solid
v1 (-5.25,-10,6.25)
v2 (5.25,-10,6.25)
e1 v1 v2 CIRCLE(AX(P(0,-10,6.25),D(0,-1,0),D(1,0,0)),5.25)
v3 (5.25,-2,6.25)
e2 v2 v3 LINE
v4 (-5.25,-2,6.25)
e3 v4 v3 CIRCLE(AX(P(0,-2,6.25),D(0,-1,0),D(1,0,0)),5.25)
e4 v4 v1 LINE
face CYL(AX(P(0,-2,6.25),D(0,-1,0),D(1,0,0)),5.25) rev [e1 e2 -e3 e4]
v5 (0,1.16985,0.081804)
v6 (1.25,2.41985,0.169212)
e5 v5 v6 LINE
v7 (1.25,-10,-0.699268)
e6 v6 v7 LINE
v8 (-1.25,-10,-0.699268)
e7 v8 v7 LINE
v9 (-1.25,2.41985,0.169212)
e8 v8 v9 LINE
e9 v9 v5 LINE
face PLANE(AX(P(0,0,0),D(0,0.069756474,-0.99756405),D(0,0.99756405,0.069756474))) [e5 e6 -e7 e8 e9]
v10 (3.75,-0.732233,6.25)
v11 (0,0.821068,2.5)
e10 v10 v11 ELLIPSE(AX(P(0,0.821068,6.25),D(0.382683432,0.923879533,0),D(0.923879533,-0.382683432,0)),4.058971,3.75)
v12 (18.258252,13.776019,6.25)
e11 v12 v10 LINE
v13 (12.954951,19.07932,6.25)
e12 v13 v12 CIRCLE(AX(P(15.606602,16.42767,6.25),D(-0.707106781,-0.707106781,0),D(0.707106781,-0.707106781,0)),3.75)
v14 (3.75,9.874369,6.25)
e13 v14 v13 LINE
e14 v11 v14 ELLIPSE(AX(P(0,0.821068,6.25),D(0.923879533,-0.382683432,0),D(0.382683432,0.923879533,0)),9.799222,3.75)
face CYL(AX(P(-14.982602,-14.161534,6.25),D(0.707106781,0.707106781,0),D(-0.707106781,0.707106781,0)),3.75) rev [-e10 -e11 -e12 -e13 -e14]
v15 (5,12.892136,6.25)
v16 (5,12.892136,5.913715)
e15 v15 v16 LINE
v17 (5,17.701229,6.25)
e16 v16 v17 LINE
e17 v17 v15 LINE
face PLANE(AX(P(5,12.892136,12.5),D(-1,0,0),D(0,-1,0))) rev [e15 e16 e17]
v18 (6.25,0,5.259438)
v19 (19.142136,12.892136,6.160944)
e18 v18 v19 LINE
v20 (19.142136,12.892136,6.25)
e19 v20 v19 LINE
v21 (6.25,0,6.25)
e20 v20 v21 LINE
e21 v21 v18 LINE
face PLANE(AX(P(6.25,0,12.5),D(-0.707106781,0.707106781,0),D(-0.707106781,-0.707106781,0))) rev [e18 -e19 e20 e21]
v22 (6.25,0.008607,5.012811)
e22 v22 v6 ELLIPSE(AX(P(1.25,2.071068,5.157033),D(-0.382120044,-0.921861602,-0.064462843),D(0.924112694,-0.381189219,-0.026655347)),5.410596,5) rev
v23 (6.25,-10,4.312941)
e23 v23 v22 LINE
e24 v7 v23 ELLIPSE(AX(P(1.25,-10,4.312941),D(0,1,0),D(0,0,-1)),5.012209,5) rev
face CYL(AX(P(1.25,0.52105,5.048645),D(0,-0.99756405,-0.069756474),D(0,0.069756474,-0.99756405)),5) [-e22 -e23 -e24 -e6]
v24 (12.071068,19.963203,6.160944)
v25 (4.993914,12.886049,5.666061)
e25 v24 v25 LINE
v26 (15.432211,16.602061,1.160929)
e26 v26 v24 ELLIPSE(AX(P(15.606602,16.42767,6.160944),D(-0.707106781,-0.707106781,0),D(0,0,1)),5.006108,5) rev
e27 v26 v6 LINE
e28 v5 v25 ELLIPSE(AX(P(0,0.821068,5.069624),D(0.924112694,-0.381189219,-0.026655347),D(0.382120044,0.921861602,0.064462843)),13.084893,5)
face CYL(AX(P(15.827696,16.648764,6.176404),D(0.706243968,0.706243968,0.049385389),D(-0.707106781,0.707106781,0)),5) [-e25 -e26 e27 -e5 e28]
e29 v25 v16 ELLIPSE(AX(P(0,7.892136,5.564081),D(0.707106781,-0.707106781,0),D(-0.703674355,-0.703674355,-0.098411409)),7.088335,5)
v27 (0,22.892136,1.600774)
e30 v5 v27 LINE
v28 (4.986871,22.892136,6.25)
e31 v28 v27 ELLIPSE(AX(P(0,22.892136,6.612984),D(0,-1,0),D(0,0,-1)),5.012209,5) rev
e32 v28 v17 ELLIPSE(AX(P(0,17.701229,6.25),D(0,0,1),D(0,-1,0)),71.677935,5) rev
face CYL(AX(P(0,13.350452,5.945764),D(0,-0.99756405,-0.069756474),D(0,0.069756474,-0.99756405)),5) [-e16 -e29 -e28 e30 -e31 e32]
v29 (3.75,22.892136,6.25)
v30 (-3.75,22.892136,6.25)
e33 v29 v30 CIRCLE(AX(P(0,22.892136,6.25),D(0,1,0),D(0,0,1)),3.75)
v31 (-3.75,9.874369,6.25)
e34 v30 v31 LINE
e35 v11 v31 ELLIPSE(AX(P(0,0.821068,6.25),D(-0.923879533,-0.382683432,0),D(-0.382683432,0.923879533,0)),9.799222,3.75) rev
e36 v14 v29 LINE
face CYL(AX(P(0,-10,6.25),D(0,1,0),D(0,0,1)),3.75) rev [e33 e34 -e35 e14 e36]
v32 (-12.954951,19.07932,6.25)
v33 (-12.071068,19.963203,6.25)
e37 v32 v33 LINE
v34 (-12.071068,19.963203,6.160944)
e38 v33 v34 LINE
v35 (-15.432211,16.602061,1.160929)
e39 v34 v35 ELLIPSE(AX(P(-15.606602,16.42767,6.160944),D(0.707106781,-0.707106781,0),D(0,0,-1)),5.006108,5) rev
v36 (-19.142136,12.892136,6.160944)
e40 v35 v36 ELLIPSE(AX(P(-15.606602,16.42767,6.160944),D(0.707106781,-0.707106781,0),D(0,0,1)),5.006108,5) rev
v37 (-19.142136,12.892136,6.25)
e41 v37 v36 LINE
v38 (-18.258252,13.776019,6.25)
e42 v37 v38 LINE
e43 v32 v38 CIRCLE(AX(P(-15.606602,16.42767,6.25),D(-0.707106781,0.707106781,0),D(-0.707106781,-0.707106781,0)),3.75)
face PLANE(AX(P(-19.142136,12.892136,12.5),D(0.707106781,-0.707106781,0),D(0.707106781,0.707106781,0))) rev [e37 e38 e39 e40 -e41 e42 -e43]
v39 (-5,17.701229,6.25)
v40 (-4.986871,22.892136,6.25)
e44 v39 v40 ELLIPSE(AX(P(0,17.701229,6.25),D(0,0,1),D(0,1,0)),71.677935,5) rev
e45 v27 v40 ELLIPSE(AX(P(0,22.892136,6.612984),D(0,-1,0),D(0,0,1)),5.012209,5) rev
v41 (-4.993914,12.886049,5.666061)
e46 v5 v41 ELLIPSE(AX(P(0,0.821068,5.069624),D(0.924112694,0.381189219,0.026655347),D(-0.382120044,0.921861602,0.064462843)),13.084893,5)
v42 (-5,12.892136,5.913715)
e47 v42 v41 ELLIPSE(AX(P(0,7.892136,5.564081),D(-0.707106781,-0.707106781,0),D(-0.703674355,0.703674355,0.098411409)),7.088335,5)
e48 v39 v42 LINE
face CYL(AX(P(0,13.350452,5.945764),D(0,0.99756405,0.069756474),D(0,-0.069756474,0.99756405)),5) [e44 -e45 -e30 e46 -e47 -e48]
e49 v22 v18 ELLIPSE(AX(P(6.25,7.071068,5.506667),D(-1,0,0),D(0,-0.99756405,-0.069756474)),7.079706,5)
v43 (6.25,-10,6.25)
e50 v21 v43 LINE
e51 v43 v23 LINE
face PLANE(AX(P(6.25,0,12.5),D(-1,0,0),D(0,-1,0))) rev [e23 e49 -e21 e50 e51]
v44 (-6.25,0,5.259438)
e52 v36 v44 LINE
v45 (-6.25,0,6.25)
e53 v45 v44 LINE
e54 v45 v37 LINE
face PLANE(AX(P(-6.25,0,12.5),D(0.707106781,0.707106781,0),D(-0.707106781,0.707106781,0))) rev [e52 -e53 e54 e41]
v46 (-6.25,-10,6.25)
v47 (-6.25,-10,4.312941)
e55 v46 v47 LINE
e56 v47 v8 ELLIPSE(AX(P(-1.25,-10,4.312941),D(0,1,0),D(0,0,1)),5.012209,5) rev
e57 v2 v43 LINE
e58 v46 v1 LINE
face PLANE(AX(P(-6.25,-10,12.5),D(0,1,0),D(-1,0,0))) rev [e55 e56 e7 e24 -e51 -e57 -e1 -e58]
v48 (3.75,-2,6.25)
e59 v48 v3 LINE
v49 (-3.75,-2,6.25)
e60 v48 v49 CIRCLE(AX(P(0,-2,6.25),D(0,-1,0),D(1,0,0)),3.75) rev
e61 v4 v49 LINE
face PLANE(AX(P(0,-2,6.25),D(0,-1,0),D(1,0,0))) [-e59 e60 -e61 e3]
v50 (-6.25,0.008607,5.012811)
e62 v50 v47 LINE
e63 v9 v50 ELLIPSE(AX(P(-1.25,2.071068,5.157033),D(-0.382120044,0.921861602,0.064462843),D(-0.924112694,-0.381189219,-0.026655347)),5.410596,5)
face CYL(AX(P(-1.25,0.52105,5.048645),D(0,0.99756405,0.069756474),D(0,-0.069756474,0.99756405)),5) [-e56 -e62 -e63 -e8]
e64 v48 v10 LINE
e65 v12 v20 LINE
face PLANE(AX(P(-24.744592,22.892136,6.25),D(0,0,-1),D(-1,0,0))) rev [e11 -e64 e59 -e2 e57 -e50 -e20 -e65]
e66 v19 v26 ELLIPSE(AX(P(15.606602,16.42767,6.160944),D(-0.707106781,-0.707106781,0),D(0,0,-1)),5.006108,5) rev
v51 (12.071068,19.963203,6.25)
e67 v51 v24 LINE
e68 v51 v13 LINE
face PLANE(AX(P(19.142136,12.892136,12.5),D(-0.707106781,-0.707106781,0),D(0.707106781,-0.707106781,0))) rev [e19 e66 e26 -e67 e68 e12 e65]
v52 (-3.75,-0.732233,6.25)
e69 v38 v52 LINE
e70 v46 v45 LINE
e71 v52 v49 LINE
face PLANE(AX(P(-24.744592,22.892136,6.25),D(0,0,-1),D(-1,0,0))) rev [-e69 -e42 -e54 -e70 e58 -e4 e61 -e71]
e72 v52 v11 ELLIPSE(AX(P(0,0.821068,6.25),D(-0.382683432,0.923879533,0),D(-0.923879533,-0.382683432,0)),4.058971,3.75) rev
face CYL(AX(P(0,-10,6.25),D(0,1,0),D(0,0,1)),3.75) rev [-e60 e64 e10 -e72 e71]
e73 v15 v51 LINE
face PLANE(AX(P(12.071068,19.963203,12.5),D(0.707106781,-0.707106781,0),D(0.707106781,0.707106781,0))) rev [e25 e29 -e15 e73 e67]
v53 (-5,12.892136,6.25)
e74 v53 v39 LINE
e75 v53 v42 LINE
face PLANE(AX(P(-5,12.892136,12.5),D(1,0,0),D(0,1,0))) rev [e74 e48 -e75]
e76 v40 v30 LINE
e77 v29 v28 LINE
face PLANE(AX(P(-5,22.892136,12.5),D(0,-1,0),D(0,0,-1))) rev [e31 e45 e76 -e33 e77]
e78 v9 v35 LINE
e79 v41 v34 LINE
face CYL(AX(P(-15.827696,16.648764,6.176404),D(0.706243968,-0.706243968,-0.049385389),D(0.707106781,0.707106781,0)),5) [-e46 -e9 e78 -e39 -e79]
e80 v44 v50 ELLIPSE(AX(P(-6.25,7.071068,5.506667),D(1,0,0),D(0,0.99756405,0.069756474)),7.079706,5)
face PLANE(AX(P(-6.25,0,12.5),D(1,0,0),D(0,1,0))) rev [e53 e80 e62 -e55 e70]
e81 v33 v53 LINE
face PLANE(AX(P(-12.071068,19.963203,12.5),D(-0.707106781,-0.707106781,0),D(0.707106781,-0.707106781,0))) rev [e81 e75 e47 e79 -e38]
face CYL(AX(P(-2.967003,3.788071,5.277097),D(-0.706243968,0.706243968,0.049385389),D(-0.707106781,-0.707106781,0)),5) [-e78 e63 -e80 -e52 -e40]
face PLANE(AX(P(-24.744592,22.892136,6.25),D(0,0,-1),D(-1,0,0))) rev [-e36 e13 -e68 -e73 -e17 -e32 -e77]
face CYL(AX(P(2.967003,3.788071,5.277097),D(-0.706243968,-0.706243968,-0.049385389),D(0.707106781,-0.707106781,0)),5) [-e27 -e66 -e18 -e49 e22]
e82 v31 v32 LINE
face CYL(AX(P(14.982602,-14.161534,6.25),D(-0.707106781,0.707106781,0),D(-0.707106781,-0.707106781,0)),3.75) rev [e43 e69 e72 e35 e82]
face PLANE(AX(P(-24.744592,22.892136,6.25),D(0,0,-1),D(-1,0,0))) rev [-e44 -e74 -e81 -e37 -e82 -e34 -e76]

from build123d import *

# Parameters (mm, degrees)
EXTRUDE_634_DEPTH           = 12.5
SKETCH_4_R                  = 3.75
CUT_EXTRUDE_991_DEPTH       = 41.057008652
CUT_EXTRUDE_1141_REACH      = 47.49
CUT_EXTRUDE_1141_END_RADIUS = 3.75
SKETCH_5_R                  = 3.75
SKETCH_9_R                  = 5.25
CUT_EXTRUDE_1315_DEPTH      = 8
DRAFT_2_ANGLE               = 4
FILLET_8_R                  = 5
SKETCH_10_W                 = 49.037593782
SKETCH_10_H                 = 8.594475989
CUT_EXTRUDE_3_DEPTH         = 41.280697872


with BuildPart() as part:
    # Эскиз3 → Extrude 634 (new body)
    with BuildSketch(Plane.XY):
        Polygon((-6.25, 0), (-19.142135624, 12.892135624), (-12.071067812, 19.963203436), (-5, 12.892135624), (-5, 22.892135624), (5, 22.892135624), (5, 12.892135624), (12.071067812, 19.963203436), (19.142135624, 12.892135624), (6.25, 0), (6.25, -10), (-6.25, -10), align=None)
    extrude(amount=EXTRUDE_634_DEPTH)

    # Эскиз4 → Cut-Extrude 991 (cut, through all)
    with BuildSketch(Plane(origin=(0, 22.892135624, 0), x_dir=(-1, 0, 0), z_dir=(0, 1, 0))):
        with Locations(Location((0, 6.25, 0), (0, 0, 90))):
            Circle(SKETCH_4_R)
    extrude(amount=-CUT_EXTRUDE_991_DEPTH, mode=Mode.SUBTRACT)

    # Cut-Extrude 1141: up to this cylinder (the profile starts outside it)
    cut_extrude_1141_end = Plane(origin=(0, 16.42767, 6.25), z_dir=(0, 1, 0)) * Cylinder(CUT_EXTRUDE_1141_END_RADIUS, 103.48, mode=Mode.PRIVATE)
    # Эскиз5 → Cut-Extrude 1141 (cut, up to the surface)
    with BuildSketch(Plane(origin=(-16.017135624, 16.017135624, 0), x_dir=(0, 0, 1), z_dir=(-0.707106781186544, 0.7071067811865511, 0)), mode=Mode.PRIVATE) as cut_extrude_1141_sk1:
        with Locations(Location((6.25, 0.580582618, 0), (0, 0, 270))):
            Circle(SKETCH_5_R)
    cut_extrude_1141_tool1 = extrude(cut_extrude_1141_sk1.sketch, amount=-CUT_EXTRUDE_1141_REACH, mode=Mode.PRIVATE) - cut_extrude_1141_end
    cut_extrude_1141 = cut_extrude_1141_tool1.solids().sort_by_distance((-15.606602, 16.42767, 6.25))[0]
    add(cut_extrude_1141, mode=Mode.SUBTRACT)

    # Зеркальное отражение1: Cut-Extrude 1141 across plane
    add(cut_extrude_1141.mirror(Plane(origin=(0, 0, 0), x_dir=(0, 0, 1), z_dir=(1, 0, 0))), mode=Mode.SUBTRACT)

    # Эскиз9 → Cut-Extrude 1315 (cut)
    with BuildSketch(Plane.XZ.offset(10)):
        with Locations((0, 6.25)):
            Circle(SKETCH_9_R)
    extrude(amount=-CUT_EXTRUDE_1315_DEPTH, mode=Mode.SUBTRACT)

    # Уклон2
    draft_2_faces = [part.faces().sort_by_distance(p)[0] for p in [
        (0, 7.90429112, 0),
        (0, 7.90429112, 12.5),
    ]]
    draft(draft_2_faces, Plane.ZX, DRAFT_2_ANGLE)

    # Скругление8
    # the kernel refuses this fillet: 5 mm, written as the material it takes off along each edge
    with BuildSketch(Plane(origin=(-3.402831812, 4.489303811, 0.313922703), x_dir=(0.707968543318461, -0.7045235927201029, -0.049265088777904954), z_dir=(0.7062439675293066, 0.7062439675293118, 0.04938538910366094))) as fillet_8_piece_1_section:
        with BuildLine():
            CenterArc((FILLET_8_R * 0.951833326591, -FILLET_8_R), FILLET_8_R, 90, 87.17272264)
            Line((-FILLET_8_R * 0.0469494411747, -FILLET_8_R * 0.950674724384), (-FILLET_8_R * 0.06692509653, -FILLET_8_R * 0.949688218872))
            Line((-FILLET_8_R * 0.06692509653, -FILLET_8_R * 0.949688218872), (-FILLET_8_R * 0.0190366665318, FILLET_8_R * 0.02))
            Line((-FILLET_8_R * 0.0190366665318, FILLET_8_R * 0.02), (FILLET_8_R * 0.951833326591, FILLET_8_R * 0.02))
            Line((FILLET_8_R * 0.951833326591, FILLET_8_R * 0.02), (FILLET_8_R * 0.951833326591, 0))
        make_face()
    fillet_8_piece_1 = extrude(amount=33.8080501, mode=Mode.PRIVATE)
    fillet_8_piece_1 = split(fillet_8_piece_1, bisect_by=Plane(origin=(12.895577991, 19.138693257, 2.078418466), z_dir=(-0.7071067811865445, -0.7071067811865507, 0)), keep=Keep.TOP, mode=Mode.PRIVATE)
    fillet_8_piece_1 = split(fillet_8_piece_1, bisect_by=Plane(origin=(5, 15.190904261, 2.078418466), z_dir=(1, 0, 0)), keep=Keep.TOP, mode=Mode.PRIVATE)
    add(fillet_8_piece_1, mode=Mode.SUBTRACT)
    with BuildSketch(Plane(origin=(5, 35.361686252, 2.472729985), x_dir=(-1, 0, 0), z_dir=(0, -0.9975640502598243, -0.06975647374412541))) as fillet_8_piece_2_section:
        with BuildLine():
            CenterArc((FILLET_8_R, -FILLET_8_R), FILLET_8_R, 90, 90)
            Line((0, -FILLET_8_R), (-FILLET_8_R * 0.02, -FILLET_8_R))
            Line((-FILLET_8_R * 0.02, -FILLET_8_R), (-FILLET_8_R * 0.02, FILLET_8_R * 0.02))
            Line((-FILLET_8_R * 0.02, FILLET_8_R * 0.02), (FILLET_8_R, FILLET_8_R * 0.02))
            Line((FILLET_8_R, FILLET_8_R * 0.02), (FILLET_8_R, 0))
        make_face()
    fillet_8_piece_2 = extrude(amount=35.024418981, mode=Mode.PRIVATE)
    fillet_8_piece_2 = split(fillet_8_piece_2, bisect_by=Plane(origin=(3.763647995, 22.892135624, 2.280840285), z_dir=(0, -1, 0)), keep=Keep.TOP, mode=Mode.PRIVATE)
    fillet_8_piece_2 = split(fillet_8_piece_2, bisect_by=Plane(origin=(6.572735996, 14.46487162, 2.280840285), z_dir=(-0.7071067811865501, 0.707106781186545, 0)), keep=Keep.TOP, mode=Mode.PRIVATE)
    add(fillet_8_piece_2, mode=Mode.SUBTRACT)
    with BuildSketch(Plane(origin=(-5, 0.422584995, 0.029550022), x_dir=(1, 0, 0), z_dir=(0, 0.9975640502598243, 0.06975647374412541))) as fillet_8_piece_3_section:
        with BuildLine():
            CenterArc((FILLET_8_R, -FILLET_8_R), FILLET_8_R, 90, 90)
            Line((0, -FILLET_8_R), (-FILLET_8_R * 0.02, -FILLET_8_R))
            Line((-FILLET_8_R * 0.02, -FILLET_8_R), (-FILLET_8_R * 0.02, FILLET_8_R * 0.02))
            Line((-FILLET_8_R * 0.02, FILLET_8_R * 0.02), (FILLET_8_R, FILLET_8_R * 0.02))
            Line((FILLET_8_R, FILLET_8_R * 0.02), (FILLET_8_R, 0))
        make_face()
    fillet_8_piece_3 = extrude(amount=35.024418981, mode=Mode.PRIVATE)
    fillet_8_piece_3 = split(fillet_8_piece_3, bisect_by=Plane(origin=(-3.763647995, 22.892135624, 2.280840285), z_dir=(0, -1, 0)), keep=Keep.TOP, mode=Mode.PRIVATE)
    fillet_8_piece_3 = split(fillet_8_piece_3, bisect_by=Plane(origin=(-6.572735996, 14.46487162, 2.280840285), z_dir=(0.7071067811865512, 0.7071067811865438, 0)), keep=Keep.TOP, mode=Mode.PRIVATE)
    add(fillet_8_piece_3, mode=Mode.SUBTRACT)
    with BuildSketch(Plane(origin=(-20.473899624, 28.366035248, 1.983546412), x_dir=(-0.707968543318462, -0.7045235927201018, -0.04926508877790491), z_dir=(0.7062439675293055, -0.706243967529313, -0.04938538910366102))) as fillet_8_piece_4_section:
        with BuildLine():
            CenterArc((FILLET_8_R * 0.951833326591, -FILLET_8_R), FILLET_8_R, 90, 87.17272264)
            Line((-FILLET_8_R * 0.0469494411747, -FILLET_8_R * 0.950674724384), (-FILLET_8_R * 0.06692509653, -FILLET_8_R * 0.949688218872))
            Line((-FILLET_8_R * 0.06692509653, -FILLET_8_R * 0.949688218872), (-FILLET_8_R * 0.0190366665318, FILLET_8_R * 0.02))
            Line((-FILLET_8_R * 0.0190366665318, FILLET_8_R * 0.02), (FILLET_8_R * 0.951833326591, FILLET_8_R * 0.02))
            Line((FILLET_8_R * 0.951833326591, FILLET_8_R * 0.02), (FILLET_8_R * 0.951833326591, 0))
        make_face()
    fillet_8_piece_4 = extrude(amount=33.8080501, mode=Mode.PRIVATE)
    fillet_8_piece_4 = split(fillet_8_piece_4, bisect_by=Plane(origin=(-12.895577991, 19.138693257, 2.078418466), z_dir=(0.7071067811865444, -0.7071067811865508, 0)), keep=Keep.TOP, mode=Mode.PRIVATE)
    fillet_8_piece_4 = split(fillet_8_piece_4, bisect_by=Plane(origin=(-5, 15.190904261, 2.078418466), z_dir=(-1, 0, 0)), keep=Keep.TOP, mode=Mode.PRIVATE)
    add(fillet_8_piece_4, mode=Mode.SUBTRACT)
    with BuildSketch(Plane(origin=(3.024785141, -9.274785141, -0.648556156), x_dir=(0.034920743526734764, -0.034920743526734764, 0.9987797972241329), z_dir=(-0.7062439675293093, 0.7062439675293093, 0.04938538910366077))) as fillet_8_piece_5_section:
        with BuildLine():
            CenterArc((FILLET_8_R * 1.0506041048, FILLET_8_R), FILLET_8_R, 177.17272264, 92.82727736)
            Line((FILLET_8_R * 0.0518213370326, FILLET_8_R * 1.04932527562), (FILLET_8_R * 0.0318456816773, FILLET_8_R * 1.05031178113))
            Line((FILLET_8_R * 0.0318456816773, FILLET_8_R * 1.05031178113), (-FILLET_8_R * 0.021012082096, -FILLET_8_R * 0.02))
            Line((-FILLET_8_R * 0.021012082096, -FILLET_8_R * 0.02), (FILLET_8_R * 1.0506041048, -FILLET_8_R * 0.02))
            Line((FILLET_8_R * 1.0506041048, -FILLET_8_R * 0.02), (FILLET_8_R * 1.0506041048, 0))
        make_face()
    fillet_8_piece_5 = extrude(amount=44.519609867, mode=Mode.PRIVATE)
    fillet_8_piece_5 = split(fillet_8_piece_5, bisect_by=Plane(origin=(-6.25, 7.634264741, 1.775571736), z_dir=(-1, 0, 0)), keep=Keep.TOP, mode=Mode.PRIVATE)
    fillet_8_piece_5 = split(fillet_8_piece_5, bisect_by=Plane(origin=(-18.350004337, 13.68426691, 1.775571736), z_dir=(0.7071067811865444, -0.7071067811865508, 0)), keep=Keep.TOP, mode=Mode.PRIVATE)
    add(fillet_8_piece_5, mode=Mode.SUBTRACT)
    with BuildSketch(Plane(origin=(-6.25, -22.469550628, -1.571224041), x_dir=(0, -0.06975647374412541, 0.9975640502598242), z_dir=(0, 0.9975640502598243, 0.06975647374412541))) as fillet_8_piece_6_section:
        with BuildLine():
            CenterArc((FILLET_8_R, FILLET_8_R), FILLET_8_R, 180, 90)
            Line((0, FILLET_8_R), (-FILLET_8_R * 0.02, FILLET_8_R))
            Line((-FILLET_8_R * 0.02, FILLET_8_R), (-FILLET_8_R * 0.02, -FILLET_8_R * 0.02))
            Line((-FILLET_8_R * 0.02, -FILLET_8_R * 0.02), (FILLET_8_R, -FILLET_8_R * 0.02))
            Line((FILLET_8_R, -FILLET_8_R * 0.02), (FILLET_8_R, 0))
        make_face()
    fillet_8_piece_6 = extrude(amount=35.024418981, mode=Mode.PRIVATE)
    fillet_8_piece_6 = split(fillet_8_piece_6, bisect_by=Plane(origin=(-2.999285634, -3.250714366, 0.827701668), z_dir=(-0.7071067811865476, -0.7071067811865476, 0)), keep=Keep.TOP, mode=Mode.PRIVATE)
    fillet_8_piece_6 = split(fillet_8_piece_6, bisect_by=Plane(origin=(-5.249047512, -10, 0.827701668), z_dir=(0, 1, 0)), keep=Keep.TOP, mode=Mode.PRIVATE)
    add(fillet_8_piece_6, mode=Mode.SUBTRACT)
    with BuildSketch(Plane(origin=(6.25, 12.469550628, 0.871955922), x_dir=(-1, 0, 0), z_dir=(0, -0.9975640502598243, -0.06975647374412541))) as fillet_8_piece_7_section:
        with BuildLine():
            CenterArc((FILLET_8_R, -FILLET_8_R), FILLET_8_R, 90, 90)
            Line((0, -FILLET_8_R), (-FILLET_8_R * 0.02, -FILLET_8_R))
            Line((-FILLET_8_R * 0.02, -FILLET_8_R), (-FILLET_8_R * 0.02, FILLET_8_R * 0.02))
            Line((-FILLET_8_R * 0.02, FILLET_8_R * 0.02), (FILLET_8_R, FILLET_8_R * 0.02))
            Line((FILLET_8_R, FILLET_8_R * 0.02), (FILLET_8_R, 0))
        make_face()
    fillet_8_piece_7 = extrude(amount=35.024418981, mode=Mode.PRIVATE)
    fillet_8_piece_7 = split(fillet_8_piece_7, bisect_by=Plane(origin=(5.249047512, -10, 0.827701668), z_dir=(0, 1, 0)), keep=Keep.TOP, mode=Mode.PRIVATE)
    fillet_8_piece_7 = split(fillet_8_piece_7, bisect_by=Plane(origin=(2.999285634, -3.250714366, 0.827701668), z_dir=(0.7071067811865476, -0.7071067811865476, 0)), keep=Keep.TOP, mode=Mode.PRIVATE)
    add(fillet_8_piece_7, mode=Mode.SUBTRACT)
    with BuildSketch(Plane(origin=(28.416920765, 22.166920765, 1.5500621), x_dir=(-0.7079685433184584, 0.7045235927201055, 0.04926508877790521), z_dir=(-0.7062439675293093, -0.7062439675293093, -0.04938538910366077))) as fillet_8_piece_8_section:
        with BuildLine():
            CenterArc((FILLET_8_R * 1.0506041048, -FILLET_8_R), FILLET_8_R, 90, 92.82727736)
            Line((FILLET_8_R * 0.0518213370326, -FILLET_8_R * 1.04932527562), (FILLET_8_R * 0.0318456816773, -FILLET_8_R * 1.05031178113))
            Line((FILLET_8_R * 0.0318456816773, -FILLET_8_R * 1.05031178113), (-FILLET_8_R * 0.021012082096, FILLET_8_R * 0.02))
            Line((-FILLET_8_R * 0.021012082096, FILLET_8_R * 0.02), (FILLET_8_R * 1.0506041048, FILLET_8_R * 0.02))
            Line((FILLET_8_R * 1.0506041048, FILLET_8_R * 0.02), (FILLET_8_R * 1.0506041048, 0))
        make_face()
    fillet_8_piece_8 = extrude(amount=44.519609867, mode=Mode.PRIVATE)
    fillet_8_piece_8 = split(fillet_8_piece_8, bisect_by=Plane(origin=(18.350004337, 13.68426691, 1.775571736), z_dir=(-0.7071067811865445, -0.7071067811865507, 0)), keep=Keep.TOP, mode=Mode.PRIVATE)
    fillet_8_piece_8 = split(fillet_8_piece_8, bisect_by=Plane(origin=(6.25, 7.634264741, 1.775571736), z_dir=(1, 0, 0)), keep=Keep.TOP, mode=Mode.PRIVATE)
    add(fillet_8_piece_8, mode=Mode.SUBTRACT)
    with BuildSketch(Plane(origin=(-6.25, -22.469550628, 14.071224041), x_dir=(0, -0.06975647374412541, -0.9975640502598242), z_dir=(0, 0.9975640502598243, -0.06975647374412541))) as fillet_8_piece_9_section:
        with BuildLine():
            CenterArc((FILLET_8_R, -FILLET_8_R), FILLET_8_R, 90, 90)
            Line((0, -FILLET_8_R), (-FILLET_8_R * 0.02, -FILLET_8_R))
            Line((-FILLET_8_R * 0.02, -FILLET_8_R), (-FILLET_8_R * 0.02, FILLET_8_R * 0.02))
            Line((-FILLET_8_R * 0.02, FILLET_8_R * 0.02), (FILLET_8_R, FILLET_8_R * 0.02))
            Line((FILLET_8_R, FILLET_8_R * 0.02), (FILLET_8_R, 0))
        make_face()
    fillet_8_piece_9 = extrude(amount=35.024418981, mode=Mode.PRIVATE)
    fillet_8_piece_9 = split(fillet_8_piece_9, bisect_by=Plane(origin=(-2.999285634, -3.250714366, 11.672298332), z_dir=(-0.7071067811865476, -0.7071067811865476, 0)), keep=Keep.TOP, mode=Mode.PRIVATE)
    fillet_8_piece_9 = split(fillet_8_piece_9, bisect_by=Plane(origin=(-5.249047512, -10, 11.672298332), z_dir=(0, 1, 0)), keep=Keep.TOP, mode=Mode.PRIVATE)
    add(fillet_8_piece_9, mode=Mode.SUBTRACT)
    with BuildSketch(Plane(origin=(6.25, 12.469550628, 11.628044078), x_dir=(-1, 0, 0), z_dir=(0, -0.9975640502598243, 0.06975647374412541))) as fillet_8_piece_10_section:
        with BuildLine():
            CenterArc((FILLET_8_R, FILLET_8_R), FILLET_8_R, 180, 90)
            Line((0, FILLET_8_R), (-FILLET_8_R * 0.02, FILLET_8_R))
            Line((-FILLET_8_R * 0.02, FILLET_8_R), (-FILLET_8_R * 0.02, -FILLET_8_R * 0.02))
            Line((-FILLET_8_R * 0.02, -FILLET_8_R * 0.02), (FILLET_8_R, -FILLET_8_R * 0.02))
            Line((FILLET_8_R, -FILLET_8_R * 0.02), (FILLET_8_R, 0))
        make_face()
    fillet_8_piece_10 = extrude(amount=35.024418981, mode=Mode.PRIVATE)
    fillet_8_piece_10 = split(fillet_8_piece_10, bisect_by=Plane(origin=(5.249047512, -10, 11.672298332), z_dir=(0, 1, 0)), keep=Keep.TOP, mode=Mode.PRIVATE)
    fillet_8_piece_10 = split(fillet_8_piece_10, bisect_by=Plane(origin=(2.999285634, -3.250714366, 11.672298332), z_dir=(0.7071067811865476, -0.7071067811865476, 0)), keep=Keep.TOP, mode=Mode.PRIVATE)
    add(fillet_8_piece_10, mode=Mode.SUBTRACT)
    with BuildSketch(Plane(origin=(28.416920765, 22.166920765, 10.9499379), x_dir=(-0.7079685433184584, 0.7045235927201055, -0.049265088777905426), z_dir=(-0.7062439675293093, -0.7062439675293093, 0.04938538910366077))) as fillet_8_piece_11_section:
        with BuildLine():
            CenterArc((FILLET_8_R * 1.0506041048, FILLET_8_R), FILLET_8_R, 177.17272264, 92.82727736)
            Line((FILLET_8_R * 0.0518213370326, FILLET_8_R * 1.04932527562), (FILLET_8_R * 0.0318456816773, FILLET_8_R * 1.05031178113))
            Line((FILLET_8_R * 0.0318456816773, FILLET_8_R * 1.05031178113), (-FILLET_8_R * 0.021012082096, -FILLET_8_R * 0.02))
            Line((-FILLET_8_R * 0.021012082096, -FILLET_8_R * 0.02), (FILLET_8_R * 1.0506041048, -FILLET_8_R * 0.02))
            Line((FILLET_8_R * 1.0506041048, -FILLET_8_R * 0.02), (FILLET_8_R * 1.0506041048, 0))
        make_face()
    fillet_8_piece_11 = extrude(amount=44.519609867, mode=Mode.PRIVATE)
    fillet_8_piece_11 = split(fillet_8_piece_11, bisect_by=Plane(origin=(18.350004337, 13.68426691, 10.724428264), z_dir=(-0.7071067811865445, -0.7071067811865507, 0)), keep=Keep.TOP, mode=Mode.PRIVATE)
    fillet_8_piece_11 = split(fillet_8_piece_11, bisect_by=Plane(origin=(6.25, 7.634264741, 10.724428264), z_dir=(1, 0, 0)), keep=Keep.TOP, mode=Mode.PRIVATE)
    add(fillet_8_piece_11, mode=Mode.SUBTRACT)
    with BuildSketch(Plane(origin=(-3.402831812, 4.489303811, 12.186077297), x_dir=(0.707968543318461, -0.7045235927201029, 0.04926508877790491), z_dir=(0.7062439675293066, 0.7062439675293118, -0.04938538910366094))) as fillet_8_piece_12_section:
        with BuildLine():
            CenterArc((FILLET_8_R * 0.951833326591, FILLET_8_R), FILLET_8_R, 182.82727736, 87.17272264)
            Line((-FILLET_8_R * 0.0469494411747, FILLET_8_R * 0.950674724384), (-FILLET_8_R * 0.06692509653, FILLET_8_R * 0.949688218872))
            Line((-FILLET_8_R * 0.06692509653, FILLET_8_R * 0.949688218872), (-FILLET_8_R * 0.0190366665318, -FILLET_8_R * 0.02))
            Line((-FILLET_8_R * 0.0190366665318, -FILLET_8_R * 0.02), (FILLET_8_R * 0.951833326591, -FILLET_8_R * 0.02))
            Line((FILLET_8_R * 0.951833326591, -FILLET_8_R * 0.02), (FILLET_8_R * 0.951833326591, 0))
        make_face()
    fillet_8_piece_12 = extrude(amount=33.8080501, mode=Mode.PRIVATE)
    fillet_8_piece_12 = split(fillet_8_piece_12, bisect_by=Plane(origin=(12.895577991, 19.138693257, 10.421581534), z_dir=(-0.7071067811865445, -0.7071067811865507, 0)), keep=Keep.TOP, mode=Mode.PRIVATE)
    fillet_8_piece_12 = split(fillet_8_piece_12, bisect_by=Plane(origin=(5, 15.190904261, 10.421581534), z_dir=(1, 0, 0)), keep=Keep.TOP, mode=Mode.PRIVATE)
    add(fillet_8_piece_12, mode=Mode.SUBTRACT)
    with BuildSketch(Plane(origin=(5, 35.361686252, 10.027270015), x_dir=(-1, 0, 0), z_dir=(0, -0.9975640502598243, 0.06975647374412541))) as fillet_8_piece_13_section:
        with BuildLine():
            CenterArc((FILLET_8_R, FILLET_8_R), FILLET_8_R, 180, 90)
            Line((0, FILLET_8_R), (-FILLET_8_R * 0.02, FILLET_8_R))
            Line((-FILLET_8_R * 0.02, FILLET_8_R), (-FILLET_8_R * 0.02, -FILLET_8_R * 0.02))
            Line((-FILLET_8_R * 0.02, -FILLET_8_R * 0.02), (FILLET_8_R, -FILLET_8_R * 0.02))
            Line((FILLET_8_R, -FILLET_8_R * 0.02), (FILLET_8_R, 0))
        make_face()
    fillet_8_piece_13 = extrude(amount=35.024418981, mode=Mode.PRIVATE)
    fillet_8_piece_13 = split(fillet_8_piece_13, bisect_by=Plane(origin=(3.763647995, 22.892135624, 10.219159715), z_dir=(0, -1, 0)), keep=Keep.TOP, mode=Mode.PRIVATE)
    fillet_8_piece_13 = split(fillet_8_piece_13, bisect_by=Plane(origin=(6.572735996, 14.46487162, 10.219159715), z_dir=(-0.7071067811865501, 0.707106781186545, 0)), keep=Keep.TOP, mode=Mode.PRIVATE)
    add(fillet_8_piece_13, mode=Mode.SUBTRACT)
    with BuildSketch(Plane(origin=(-5, 0.422584995, 12.470449978), x_dir=(1, 0, 0), z_dir=(0, 0.9975640502598243, -0.06975647374412541))) as fillet_8_piece_14_section:
        with BuildLine():
            CenterArc((FILLET_8_R, FILLET_8_R), FILLET_8_R, 180, 90)
            Line((0, FILLET_8_R), (-FILLET_8_R * 0.02, FILLET_8_R))
            Line((-FILLET_8_R * 0.02, FILLET_8_R), (-FILLET_8_R * 0.02, -FILLET_8_R * 0.02))
            Line((-FILLET_8_R * 0.02, -FILLET_8_R * 0.02), (FILLET_8_R, -FILLET_8_R * 0.02))
            Line((FILLET_8_R, -FILLET_8_R * 0.02), (FILLET_8_R, 0))
        make_face()
    fillet_8_piece_14 = extrude(amount=35.024418981, mode=Mode.PRIVATE)
    fillet_8_piece_14 = split(fillet_8_piece_14, bisect_by=Plane(origin=(-3.763647995, 22.892135624, 10.219159715), z_dir=(0, -1, 0)), keep=Keep.TOP, mode=Mode.PRIVATE)
    fillet_8_piece_14 = split(fillet_8_piece_14, bisect_by=Plane(origin=(-6.572735996, 14.46487162, 10.219159715), z_dir=(0.7071067811865512, 0.7071067811865438, 0)), keep=Keep.TOP, mode=Mode.PRIVATE)
    add(fillet_8_piece_14, mode=Mode.SUBTRACT)
    with BuildSketch(Plane(origin=(-20.473899624, 28.366035248, 10.516453588), x_dir=(-0.7079685433184622, -0.7045235927201017, 0.04926508877790538), z_dir=(0.7062439675293055, -0.706243967529313, 0.04938538910366102))) as fillet_8_piece_15_section:
        with BuildLine():
            CenterArc((FILLET_8_R * 0.951833326591, FILLET_8_R), FILLET_8_R, 182.82727736, 87.17272264)
            Line((-FILLET_8_R * 0.0469494411747, FILLET_8_R * 0.950674724384), (-FILLET_8_R * 0.06692509653, FILLET_8_R * 0.949688218872))
            Line((-FILLET_8_R * 0.06692509653, FILLET_8_R * 0.949688218872), (-FILLET_8_R * 0.0190366665318, -FILLET_8_R * 0.02))
            Line((-FILLET_8_R * 0.0190366665318, -FILLET_8_R * 0.02), (FILLET_8_R * 0.951833326591, -FILLET_8_R * 0.02))
            Line((FILLET_8_R * 0.951833326591, -FILLET_8_R * 0.02), (FILLET_8_R * 0.951833326591, 0))
        make_face()
    fillet_8_piece_15 = extrude(amount=33.8080501, mode=Mode.PRIVATE)
    fillet_8_piece_15 = split(fillet_8_piece_15, bisect_by=Plane(origin=(-12.895577991, 19.138693257, 10.421581534), z_dir=(0.7071067811865444, -0.7071067811865508, 0)), keep=Keep.TOP, mode=Mode.PRIVATE)
    fillet_8_piece_15 = split(fillet_8_piece_15, bisect_by=Plane(origin=(-5, 15.190904261, 10.421581534), z_dir=(-1, 0, 0)), keep=Keep.TOP, mode=Mode.PRIVATE)
    add(fillet_8_piece_15, mode=Mode.SUBTRACT)
    with BuildSketch(Plane(origin=(3.024785141, -9.274785141, 13.148556156), x_dir=(0.034920743526734764, -0.034920743526734764, -0.9987797972241329), z_dir=(-0.7062439675293093, 0.7062439675293093, -0.04938538910366077))) as fillet_8_piece_16_section:
        with BuildLine():
            CenterArc((FILLET_8_R * 1.0506041048, -FILLET_8_R), FILLET_8_R, 90, 92.82727736)
            Line((FILLET_8_R * 0.0518213370326, -FILLET_8_R * 1.04932527562), (FILLET_8_R * 0.0318456816773, -FILLET_8_R * 1.05031178113))
            Line((FILLET_8_R * 0.0318456816773, -FILLET_8_R * 1.05031178113), (-FILLET_8_R * 0.021012082096, FILLET_8_R * 0.02))
            Line((-FILLET_8_R * 0.021012082096, FILLET_8_R * 0.02), (FILLET_8_R * 1.0506041048, FILLET_8_R * 0.02))
            Line((FILLET_8_R * 1.0506041048, FILLET_8_R * 0.02), (FILLET_8_R * 1.0506041048, 0))
        make_face()
    fillet_8_piece_16 = extrude(amount=44.519609867, mode=Mode.PRIVATE)
    fillet_8_piece_16 = split(fillet_8_piece_16, bisect_by=Plane(origin=(-6.25, 7.634264741, 10.724428264), z_dir=(-1, 0, 0)), keep=Keep.TOP, mode=Mode.PRIVATE)
    fillet_8_piece_16 = split(fillet_8_piece_16, bisect_by=Plane(origin=(-18.350004337, 13.68426691, 10.724428264), z_dir=(0.7071067811865444, -0.7071067811865508, 0)), keep=Keep.TOP, mode=Mode.PRIVATE)
    add(fillet_8_piece_16, mode=Mode.SUBTRACT)
    with BuildSketch(Plane(origin=(5, 35.361686252, 2.472729985), x_dir=(-1, 0, 0), z_dir=(0, -0.9975640502598243, -0.06975647374412541))) as fillet_8_piece_17a_section:
        with BuildLine():
            CenterArc((FILLET_8_R, -FILLET_8_R), FILLET_8_R, 90, 90)
            Line((0, -FILLET_8_R), (-FILLET_8_R * 0.02, -FILLET_8_R))
            Line((-FILLET_8_R * 0.02, -FILLET_8_R), (-FILLET_8_R * 0.02, FILLET_8_R * 0.02))
            Line((-FILLET_8_R * 0.02, FILLET_8_R * 0.02), (FILLET_8_R, FILLET_8_R * 0.02))
            Line((FILLET_8_R, FILLET_8_R * 0.02), (FILLET_8_R, 0))
        make_face()
    fillet_8_piece_17a = extrude(amount=35.024418981, mode=Mode.PRIVATE)
    fillet_8_piece_17a = split(fillet_8_piece_17a, bisect_by=Plane(origin=(1.092194354, 8.984329978, 1.628858747), z_dir=(0.7071067811865501, -0.707106781186545, 0)), keep=Keep.TOP, mode=Mode.PRIVATE)
    with BuildSketch(Plane(origin=(-3.402831812, 4.489303811, 0.313922703), x_dir=(0.707968543318461, -0.7045235927201029, -0.049265088777904954), z_dir=(0.7062439675293066, 0.7062439675293118, 0.04938538910366094))) as fillet_8_piece_17b_section:
        with BuildLine():
            CenterArc((FILLET_8_R * 0.951833326591, -FILLET_8_R), FILLET_8_R, 90, 87.17272264)
            Line((-FILLET_8_R * 0.0469494411747, -FILLET_8_R * 0.950674724384), (-FILLET_8_R * 0.06692509653, -FILLET_8_R * 0.949688218872))
            Line((-FILLET_8_R * 0.06692509653, -FILLET_8_R * 0.949688218872), (-FILLET_8_R * 0.0190366665318, FILLET_8_R * 0.02))
            Line((-FILLET_8_R * 0.0190366665318, FILLET_8_R * 0.02), (FILLET_8_R * 0.951833326591, FILLET_8_R * 0.02))
            Line((FILLET_8_R * 0.951833326591, FILLET_8_R * 0.02), (FILLET_8_R * 0.951833326591, 0))
        make_face()
    fillet_8_piece_17b = extrude(amount=33.8080501, mode=Mode.PRIVATE)
    fillet_8_piece_17b = split(fillet_8_piece_17b, bisect_by=Plane(origin=(5, 7.643322174, 1.670148542), z_dir=(-1, 0, 0)), keep=Keep.TOP, mode=Mode.PRIVATE)
    fillet_8_piece_17 = fillet_8_piece_17a & fillet_8_piece_17b
    add(fillet_8_piece_17, mode=Mode.SUBTRACT)
    with BuildSketch(Plane(origin=(-20.473899624, 28.366035248, 1.983546412), x_dir=(-0.707968543318462, -0.7045235927201018, -0.04926508877790491), z_dir=(0.7062439675293055, -0.706243967529313, -0.04938538910366102))) as fillet_8_piece_18a_section:
        with BuildLine():
            CenterArc((FILLET_8_R * 0.951833326591, -FILLET_8_R), FILLET_8_R, 90, 87.17272264)
            Line((-FILLET_8_R * 0.0469494411747, -FILLET_8_R * 0.950674724384), (-FILLET_8_R * 0.06692509653, -FILLET_8_R * 0.949688218872))
            Line((-FILLET_8_R * 0.06692509653, -FILLET_8_R * 0.949688218872), (-FILLET_8_R * 0.0190366665318, FILLET_8_R * 0.02))
            Line((-FILLET_8_R * 0.0190366665318, FILLET_8_R * 0.02), (FILLET_8_R * 0.951833326591, FILLET_8_R * 0.02))
            Line((FILLET_8_R * 0.951833326591, FILLET_8_R * 0.02), (FILLET_8_R * 0.951833326591, 0))
        make_face()
    fillet_8_piece_18a = extrude(amount=33.8080501, mode=Mode.PRIVATE)
    fillet_8_piece_18a = split(fillet_8_piece_18a, bisect_by=Plane(origin=(-5, 7.643322174, 1.670148542), z_dir=(1, 0, 0)), keep=Keep.TOP, mode=Mode.PRIVATE)
    with BuildSketch(Plane(origin=(-5, 0.422584995, 0.029550022), x_dir=(1, 0, 0), z_dir=(0, 0.9975640502598243, 0.06975647374412541))) as fillet_8_piece_18b_section:
        with BuildLine():
            CenterArc((FILLET_8_R, -FILLET_8_R), FILLET_8_R, 90, 90)
            Line((0, -FILLET_8_R), (-FILLET_8_R * 0.02, -FILLET_8_R))
            Line((-FILLET_8_R * 0.02, -FILLET_8_R), (-FILLET_8_R * 0.02, FILLET_8_R * 0.02))
            Line((-FILLET_8_R * 0.02, FILLET_8_R * 0.02), (FILLET_8_R, FILLET_8_R * 0.02))
            Line((FILLET_8_R, FILLET_8_R * 0.02), (FILLET_8_R, 0))
        make_face()
    fillet_8_piece_18b = extrude(amount=35.024418981, mode=Mode.PRIVATE)
    fillet_8_piece_18b = split(fillet_8_piece_18b, bisect_by=Plane(origin=(-1.092194354, 8.984329978, 1.628858747), z_dir=(-0.7071067811865512, -0.7071067811865438, 0)), keep=Keep.TOP, mode=Mode.PRIVATE)
    fillet_8_piece_18 = fillet_8_piece_18a & fillet_8_piece_18b
    add(fillet_8_piece_18, mode=Mode.SUBTRACT)
    with BuildSketch(Plane(origin=(3.024785141, -9.274785141, -0.648556156), x_dir=(0.034920743526734764, -0.034920743526734764, 0.9987797972241329), z_dir=(-0.7062439675293093, 0.7062439675293093, 0.04938538910366077))) as fillet_8_piece_19a_section:
        with BuildLine():
            CenterArc((FILLET_8_R * 1.0506041048, FILLET_8_R), FILLET_8_R, 177.17272264, 92.82727736)
            Line((FILLET_8_R * 0.0518213370326, FILLET_8_R * 1.04932527562), (FILLET_8_R * 0.0318456816773, FILLET_8_R * 1.05031178113))
            Line((FILLET_8_R * 0.0318456816773, FILLET_8_R * 1.05031178113), (-FILLET_8_R * 0.021012082096, -FILLET_8_R * 0.02))
            Line((-FILLET_8_R * 0.021012082096, -FILLET_8_R * 0.02), (FILLET_8_R * 1.0506041048, -FILLET_8_R * 0.02))
            Line((FILLET_8_R * 1.0506041048, -FILLET_8_R * 0.02), (FILLET_8_R * 1.0506041048, 0))
        make_face()
    fillet_8_piece_19a = extrude(amount=44.519609867, mode=Mode.PRIVATE)
    fillet_8_piece_19a = split(fillet_8_piece_19a, bisect_by=Plane(origin=(-6.25, -3.300210826, 0.918854804), z_dir=(1, 0, 0)), keep=Keep.TOP, mode=Mode.PRIVATE)
    with BuildSketch(Plane(origin=(-6.25, -22.469550628, -1.571224041), x_dir=(0, -0.06975647374412541, 0.9975640502598242), z_dir=(0, 0.9975640502598243, 0.06975647374412541))) as fillet_8_piece_19b_section:
        with BuildLine():
            CenterArc((FILLET_8_R, FILLET_8_R), FILLET_8_R, 180, 90)
            Line((0, FILLET_8_R), (-FILLET_8_R * 0.02, FILLET_8_R))
            Line((-FILLET_8_R * 0.02, FILLET_8_R), (-FILLET_8_R * 0.02, -FILLET_8_R * 0.02))
            Line((-FILLET_8_R * 0.02, -FILLET_8_R * 0.02), (FILLET_8_R, -FILLET_8_R * 0.02))
            Line((FILLET_8_R, -FILLET_8_R * 0.02), (FILLET_8_R, 0))
        make_face()
    fillet_8_piece_19b = extrude(amount=35.024418981, mode=Mode.PRIVATE)
    fillet_8_piece_19b = split(fillet_8_piece_19b, bisect_by=Plane(origin=(-8.432556222, 2.182556222, 1.468496312), z_dir=(0.7071067811865476, 0.7071067811865476, 0)), keep=Keep.TOP, mode=Mode.PRIVATE)
    fillet_8_piece_19 = fillet_8_piece_19a & fillet_8_piece_19b
    add(fillet_8_piece_19, mode=Mode.SUBTRACT)
    with BuildSketch(Plane(origin=(28.416920765, 22.166920765, 1.5500621), x_dir=(-0.7079685433184584, 0.7045235927201055, 0.04926508877790521), z_dir=(-0.7062439675293093, -0.7062439675293093, -0.04938538910366077))) as fillet_8_piece_20a_section:
        with BuildLine():
            CenterArc((FILLET_8_R * 1.0506041048, -FILLET_8_R), FILLET_8_R, 90, 92.82727736)
            Line((FILLET_8_R * 0.0518213370326, -FILLET_8_R * 1.04932527562), (FILLET_8_R * 0.0318456816773, -FILLET_8_R * 1.05031178113))
            Line((FILLET_8_R * 0.0318456816773, -FILLET_8_R * 1.05031178113), (-FILLET_8_R * 0.021012082096, FILLET_8_R * 0.02))
            Line((-FILLET_8_R * 0.021012082096, FILLET_8_R * 0.02), (FILLET_8_R * 1.0506041048, FILLET_8_R * 0.02))
            Line((FILLET_8_R * 1.0506041048, FILLET_8_R * 0.02), (FILLET_8_R * 1.0506041048, 0))
        make_face()
    fillet_8_piece_20a = extrude(amount=44.519609867, mode=Mode.PRIVATE)
    fillet_8_piece_20a = split(fillet_8_piece_20a, bisect_by=Plane(origin=(6.25, -3.300210826, 0.918854804), z_dir=(-1, 0, 0)), keep=Keep.TOP, mode=Mode.PRIVATE)
    with BuildSketch(Plane(origin=(6.25, 12.469550628, 0.871955922), x_dir=(-1, 0, 0), z_dir=(0, -0.9975640502598243, -0.06975647374412541))) as fillet_8_piece_20b_section:
        with BuildLine():
            CenterArc((FILLET_8_R, -FILLET_8_R), FILLET_8_R, 90, 90)
            Line((0, -FILLET_8_R), (-FILLET_8_R * 0.02, -FILLET_8_R))
            Line((-FILLET_8_R * 0.02, -FILLET_8_R), (-FILLET_8_R * 0.02, FILLET_8_R * 0.02))
            Line((-FILLET_8_R * 0.02, FILLET_8_R * 0.02), (FILLET_8_R, FILLET_8_R * 0.02))
            Line((FILLET_8_R, FILLET_8_R * 0.02), (FILLET_8_R, 0))
        make_face()
    fillet_8_piece_20b = extrude(amount=35.024418981, mode=Mode.PRIVATE)
    fillet_8_piece_20b = split(fillet_8_piece_20b, bisect_by=Plane(origin=(8.432556222, 2.182556222, 1.468496312), z_dir=(-0.7071067811865476, 0.7071067811865476, 0)), keep=Keep.TOP, mode=Mode.PRIVATE)
    fillet_8_piece_20 = fillet_8_piece_20a & fillet_8_piece_20b
    add(fillet_8_piece_20, mode=Mode.SUBTRACT)
    with BuildSketch(Plane(origin=(3.024785141, -9.274785141, 13.148556156), x_dir=(0.034920743526734764, -0.034920743526734764, -0.9987797972241329), z_dir=(-0.7062439675293093, 0.7062439675293093, -0.04938538910366077))) as fillet_8_piece_21a_section:
        with BuildLine():
            CenterArc((FILLET_8_R * 1.0506041048, -FILLET_8_R), FILLET_8_R, 90, 92.82727736)
            Line((FILLET_8_R * 0.0518213370326, -FILLET_8_R * 1.04932527562), (FILLET_8_R * 0.0318456816773, -FILLET_8_R * 1.05031178113))
            Line((FILLET_8_R * 0.0318456816773, -FILLET_8_R * 1.05031178113), (-FILLET_8_R * 0.021012082096, FILLET_8_R * 0.02))
            Line((-FILLET_8_R * 0.021012082096, FILLET_8_R * 0.02), (FILLET_8_R * 1.0506041048, FILLET_8_R * 0.02))
            Line((FILLET_8_R * 1.0506041048, FILLET_8_R * 0.02), (FILLET_8_R * 1.0506041048, 0))
        make_face()
    fillet_8_piece_21a = extrude(amount=44.519609867, mode=Mode.PRIVATE)
    fillet_8_piece_21a = split(fillet_8_piece_21a, bisect_by=Plane(origin=(-6.25, -3.300210826, 11.581145196), z_dir=(1, 0, 0)), keep=Keep.TOP, mode=Mode.PRIVATE)
    with BuildSketch(Plane(origin=(-6.25, -22.469550628, 14.071224041), x_dir=(0, -0.06975647374412541, -0.9975640502598242), z_dir=(0, 0.9975640502598243, -0.06975647374412541))) as fillet_8_piece_21b_section:
        with BuildLine():
            CenterArc((FILLET_8_R, -FILLET_8_R), FILLET_8_R, 90, 90)
            Line((0, -FILLET_8_R), (-FILLET_8_R * 0.02, -FILLET_8_R))
            Line((-FILLET_8_R * 0.02, -FILLET_8_R), (-FILLET_8_R * 0.02, FILLET_8_R * 0.02))
            Line((-FILLET_8_R * 0.02, FILLET_8_R * 0.02), (FILLET_8_R, FILLET_8_R * 0.02))
            Line((FILLET_8_R, FILLET_8_R * 0.02), (FILLET_8_R, 0))
        make_face()
    fillet_8_piece_21b = extrude(amount=35.024418981, mode=Mode.PRIVATE)
    fillet_8_piece_21b = split(fillet_8_piece_21b, bisect_by=Plane(origin=(-8.432556222, 2.182556222, 11.031503688), z_dir=(0.7071067811865476, 0.7071067811865476, 0)), keep=Keep.TOP, mode=Mode.PRIVATE)
    fillet_8_piece_21 = fillet_8_piece_21a & fillet_8_piece_21b
    add(fillet_8_piece_21, mode=Mode.SUBTRACT)
    with BuildSketch(Plane(origin=(28.416920765, 22.166920765, 10.9499379), x_dir=(-0.7079685433184584, 0.7045235927201055, -0.049265088777905426), z_dir=(-0.7062439675293093, -0.7062439675293093, 0.04938538910366077))) as fillet_8_piece_22a_section:
        with BuildLine():
            CenterArc((FILLET_8_R * 1.0506041048, FILLET_8_R), FILLET_8_R, 177.17272264, 92.82727736)
            Line((FILLET_8_R * 0.0518213370326, FILLET_8_R * 1.04932527562), (FILLET_8_R * 0.0318456816773, FILLET_8_R * 1.05031178113))
            Line((FILLET_8_R * 0.0318456816773, FILLET_8_R * 1.05031178113), (-FILLET_8_R * 0.021012082096, -FILLET_8_R * 0.02))
            Line((-FILLET_8_R * 0.021012082096, -FILLET_8_R * 0.02), (FILLET_8_R * 1.0506041048, -FILLET_8_R * 0.02))
            Line((FILLET_8_R * 1.0506041048, -FILLET_8_R * 0.02), (FILLET_8_R * 1.0506041048, 0))
        make_face()
    fillet_8_piece_22a = extrude(amount=44.519609867, mode=Mode.PRIVATE)
    fillet_8_piece_22a = split(fillet_8_piece_22a, bisect_by=Plane(origin=(6.25, -3.300210826, 11.581145196), z_dir=(-1, 0, 0)), keep=Keep.TOP, mode=Mode.PRIVATE)
    with BuildSketch(Plane(origin=(6.25, 12.469550628, 11.628044078), x_dir=(-1, 0, 0), z_dir=(0, -0.9975640502598243, 0.06975647374412541))) as fillet_8_piece_22b_section:
        with BuildLine():
            CenterArc((FILLET_8_R, FILLET_8_R), FILLET_8_R, 180, 90)
            Line((0, FILLET_8_R), (-FILLET_8_R * 0.02, FILLET_8_R))
            Line((-FILLET_8_R * 0.02, FILLET_8_R), (-FILLET_8_R * 0.02, -FILLET_8_R * 0.02))
            Line((-FILLET_8_R * 0.02, -FILLET_8_R * 0.02), (FILLET_8_R, -FILLET_8_R * 0.02))
            Line((FILLET_8_R, -FILLET_8_R * 0.02), (FILLET_8_R, 0))
        make_face()
    fillet_8_piece_22b = extrude(amount=35.024418981, mode=Mode.PRIVATE)
    fillet_8_piece_22b = split(fillet_8_piece_22b, bisect_by=Plane(origin=(8.432556222, 2.182556222, 11.031503688), z_dir=(-0.7071067811865476, 0.7071067811865476, 0)), keep=Keep.TOP, mode=Mode.PRIVATE)
    fillet_8_piece_22 = fillet_8_piece_22a & fillet_8_piece_22b
    add(fillet_8_piece_22, mode=Mode.SUBTRACT)
    with BuildSketch(Plane(origin=(5, 35.361686252, 10.027270015), x_dir=(-1, 0, 0), z_dir=(0, -0.9975640502598243, 0.06975647374412541))) as fillet_8_piece_23a_section:
        with BuildLine():
            CenterArc((FILLET_8_R, FILLET_8_R), FILLET_8_R, 180, 90)
            Line((0, FILLET_8_R), (-FILLET_8_R * 0.02, FILLET_8_R))
            Line((-FILLET_8_R * 0.02, FILLET_8_R), (-FILLET_8_R * 0.02, -FILLET_8_R * 0.02))
            Line((-FILLET_8_R * 0.02, -FILLET_8_R * 0.02), (FILLET_8_R, -FILLET_8_R * 0.02))
            Line((FILLET_8_R, -FILLET_8_R * 0.02), (FILLET_8_R, 0))
        make_face()
    fillet_8_piece_23a = extrude(amount=35.024418981, mode=Mode.PRIVATE)
    fillet_8_piece_23a = split(fillet_8_piece_23a, bisect_by=Plane(origin=(1.092194354, 8.984329978, 10.871141253), z_dir=(0.7071067811865501, -0.707106781186545, 0)), keep=Keep.TOP, mode=Mode.PRIVATE)
    with BuildSketch(Plane(origin=(-3.402831812, 4.489303811, 12.186077297), x_dir=(0.707968543318461, -0.7045235927201029, 0.04926508877790491), z_dir=(0.7062439675293066, 0.7062439675293118, -0.04938538910366094))) as fillet_8_piece_23b_section:
        with BuildLine():
            CenterArc((FILLET_8_R * 0.951833326591, FILLET_8_R), FILLET_8_R, 182.82727736, 87.17272264)
            Line((-FILLET_8_R * 0.0469494411747, FILLET_8_R * 0.950674724384), (-FILLET_8_R * 0.06692509653, FILLET_8_R * 0.949688218872))
            Line((-FILLET_8_R * 0.06692509653, FILLET_8_R * 0.949688218872), (-FILLET_8_R * 0.0190366665318, -FILLET_8_R * 0.02))
            Line((-FILLET_8_R * 0.0190366665318, -FILLET_8_R * 0.02), (FILLET_8_R * 0.951833326591, -FILLET_8_R * 0.02))
            Line((FILLET_8_R * 0.951833326591, -FILLET_8_R * 0.02), (FILLET_8_R * 0.951833326591, 0))
        make_face()
    fillet_8_piece_23b = extrude(amount=33.8080501, mode=Mode.PRIVATE)
    fillet_8_piece_23b = split(fillet_8_piece_23b, bisect_by=Plane(origin=(5, 7.643322174, 10.829851458), z_dir=(-1, 0, 0)), keep=Keep.TOP, mode=Mode.PRIVATE)
    fillet_8_piece_23 = fillet_8_piece_23a & fillet_8_piece_23b
    add(fillet_8_piece_23, mode=Mode.SUBTRACT)
    with BuildSketch(Plane(origin=(-20.473899624, 28.366035248, 10.516453588), x_dir=(-0.7079685433184622, -0.7045235927201017, 0.04926508877790538), z_dir=(0.7062439675293055, -0.706243967529313, 0.04938538910366102))) as fillet_8_piece_24a_section:
        with BuildLine():
            CenterArc((FILLET_8_R * 0.951833326591, FILLET_8_R), FILLET_8_R, 182.82727736, 87.17272264)
            Line((-FILLET_8_R * 0.0469494411747, FILLET_8_R * 0.950674724384), (-FILLET_8_R * 0.06692509653, FILLET_8_R * 0.949688218872))
            Line((-FILLET_8_R * 0.06692509653, FILLET_8_R * 0.949688218872), (-FILLET_8_R * 0.0190366665318, -FILLET_8_R * 0.02))
            Line((-FILLET_8_R * 0.0190366665318, -FILLET_8_R * 0.02), (FILLET_8_R * 0.951833326591, -FILLET_8_R * 0.02))
            Line((FILLET_8_R * 0.951833326591, -FILLET_8_R * 0.02), (FILLET_8_R * 0.951833326591, 0))
        make_face()
    fillet_8_piece_24a = extrude(amount=33.8080501, mode=Mode.PRIVATE)
    fillet_8_piece_24a = split(fillet_8_piece_24a, bisect_by=Plane(origin=(-5, 7.643322174, 10.829851458), z_dir=(1, 0, 0)), keep=Keep.TOP, mode=Mode.PRIVATE)
    with BuildSketch(Plane(origin=(-5, 0.422584995, 12.470449978), x_dir=(1, 0, 0), z_dir=(0, 0.9975640502598243, -0.06975647374412541))) as fillet_8_piece_24b_section:
        with BuildLine():
            CenterArc((FILLET_8_R, FILLET_8_R), FILLET_8_R, 180, 90)
            Line((0, FILLET_8_R), (-FILLET_8_R * 0.02, FILLET_8_R))
            Line((-FILLET_8_R * 0.02, FILLET_8_R), (-FILLET_8_R * 0.02, -FILLET_8_R * 0.02))
            Line((-FILLET_8_R * 0.02, -FILLET_8_R * 0.02), (FILLET_8_R, -FILLET_8_R * 0.02))
            Line((FILLET_8_R, -FILLET_8_R * 0.02), (FILLET_8_R, 0))
        make_face()
    fillet_8_piece_24b = extrude(amount=35.024418981, mode=Mode.PRIVATE)
    fillet_8_piece_24b = split(fillet_8_piece_24b, bisect_by=Plane(origin=(-1.092194354, 8.984329978, 10.871141253), z_dir=(-0.7071067811865512, -0.7071067811865438, 0)), keep=Keep.TOP, mode=Mode.PRIVATE)
    fillet_8_piece_24 = fillet_8_piece_24a & fillet_8_piece_24b
    add(fillet_8_piece_24, mode=Mode.SUBTRACT)

    # Эскиз10 → Вырез-Вытянуть3 (cut, through all)
    with BuildSketch(Plane.XZ.offset(10)):
        with Locations((-0.225795439, 10.547237995)):
            Rectangle(SKETCH_10_W, SKETCH_10_H)
    extrude(amount=-CUT_EXTRUDE_3_DEPTH, mode=Mode.SUBTRACT)


solid = part.part
